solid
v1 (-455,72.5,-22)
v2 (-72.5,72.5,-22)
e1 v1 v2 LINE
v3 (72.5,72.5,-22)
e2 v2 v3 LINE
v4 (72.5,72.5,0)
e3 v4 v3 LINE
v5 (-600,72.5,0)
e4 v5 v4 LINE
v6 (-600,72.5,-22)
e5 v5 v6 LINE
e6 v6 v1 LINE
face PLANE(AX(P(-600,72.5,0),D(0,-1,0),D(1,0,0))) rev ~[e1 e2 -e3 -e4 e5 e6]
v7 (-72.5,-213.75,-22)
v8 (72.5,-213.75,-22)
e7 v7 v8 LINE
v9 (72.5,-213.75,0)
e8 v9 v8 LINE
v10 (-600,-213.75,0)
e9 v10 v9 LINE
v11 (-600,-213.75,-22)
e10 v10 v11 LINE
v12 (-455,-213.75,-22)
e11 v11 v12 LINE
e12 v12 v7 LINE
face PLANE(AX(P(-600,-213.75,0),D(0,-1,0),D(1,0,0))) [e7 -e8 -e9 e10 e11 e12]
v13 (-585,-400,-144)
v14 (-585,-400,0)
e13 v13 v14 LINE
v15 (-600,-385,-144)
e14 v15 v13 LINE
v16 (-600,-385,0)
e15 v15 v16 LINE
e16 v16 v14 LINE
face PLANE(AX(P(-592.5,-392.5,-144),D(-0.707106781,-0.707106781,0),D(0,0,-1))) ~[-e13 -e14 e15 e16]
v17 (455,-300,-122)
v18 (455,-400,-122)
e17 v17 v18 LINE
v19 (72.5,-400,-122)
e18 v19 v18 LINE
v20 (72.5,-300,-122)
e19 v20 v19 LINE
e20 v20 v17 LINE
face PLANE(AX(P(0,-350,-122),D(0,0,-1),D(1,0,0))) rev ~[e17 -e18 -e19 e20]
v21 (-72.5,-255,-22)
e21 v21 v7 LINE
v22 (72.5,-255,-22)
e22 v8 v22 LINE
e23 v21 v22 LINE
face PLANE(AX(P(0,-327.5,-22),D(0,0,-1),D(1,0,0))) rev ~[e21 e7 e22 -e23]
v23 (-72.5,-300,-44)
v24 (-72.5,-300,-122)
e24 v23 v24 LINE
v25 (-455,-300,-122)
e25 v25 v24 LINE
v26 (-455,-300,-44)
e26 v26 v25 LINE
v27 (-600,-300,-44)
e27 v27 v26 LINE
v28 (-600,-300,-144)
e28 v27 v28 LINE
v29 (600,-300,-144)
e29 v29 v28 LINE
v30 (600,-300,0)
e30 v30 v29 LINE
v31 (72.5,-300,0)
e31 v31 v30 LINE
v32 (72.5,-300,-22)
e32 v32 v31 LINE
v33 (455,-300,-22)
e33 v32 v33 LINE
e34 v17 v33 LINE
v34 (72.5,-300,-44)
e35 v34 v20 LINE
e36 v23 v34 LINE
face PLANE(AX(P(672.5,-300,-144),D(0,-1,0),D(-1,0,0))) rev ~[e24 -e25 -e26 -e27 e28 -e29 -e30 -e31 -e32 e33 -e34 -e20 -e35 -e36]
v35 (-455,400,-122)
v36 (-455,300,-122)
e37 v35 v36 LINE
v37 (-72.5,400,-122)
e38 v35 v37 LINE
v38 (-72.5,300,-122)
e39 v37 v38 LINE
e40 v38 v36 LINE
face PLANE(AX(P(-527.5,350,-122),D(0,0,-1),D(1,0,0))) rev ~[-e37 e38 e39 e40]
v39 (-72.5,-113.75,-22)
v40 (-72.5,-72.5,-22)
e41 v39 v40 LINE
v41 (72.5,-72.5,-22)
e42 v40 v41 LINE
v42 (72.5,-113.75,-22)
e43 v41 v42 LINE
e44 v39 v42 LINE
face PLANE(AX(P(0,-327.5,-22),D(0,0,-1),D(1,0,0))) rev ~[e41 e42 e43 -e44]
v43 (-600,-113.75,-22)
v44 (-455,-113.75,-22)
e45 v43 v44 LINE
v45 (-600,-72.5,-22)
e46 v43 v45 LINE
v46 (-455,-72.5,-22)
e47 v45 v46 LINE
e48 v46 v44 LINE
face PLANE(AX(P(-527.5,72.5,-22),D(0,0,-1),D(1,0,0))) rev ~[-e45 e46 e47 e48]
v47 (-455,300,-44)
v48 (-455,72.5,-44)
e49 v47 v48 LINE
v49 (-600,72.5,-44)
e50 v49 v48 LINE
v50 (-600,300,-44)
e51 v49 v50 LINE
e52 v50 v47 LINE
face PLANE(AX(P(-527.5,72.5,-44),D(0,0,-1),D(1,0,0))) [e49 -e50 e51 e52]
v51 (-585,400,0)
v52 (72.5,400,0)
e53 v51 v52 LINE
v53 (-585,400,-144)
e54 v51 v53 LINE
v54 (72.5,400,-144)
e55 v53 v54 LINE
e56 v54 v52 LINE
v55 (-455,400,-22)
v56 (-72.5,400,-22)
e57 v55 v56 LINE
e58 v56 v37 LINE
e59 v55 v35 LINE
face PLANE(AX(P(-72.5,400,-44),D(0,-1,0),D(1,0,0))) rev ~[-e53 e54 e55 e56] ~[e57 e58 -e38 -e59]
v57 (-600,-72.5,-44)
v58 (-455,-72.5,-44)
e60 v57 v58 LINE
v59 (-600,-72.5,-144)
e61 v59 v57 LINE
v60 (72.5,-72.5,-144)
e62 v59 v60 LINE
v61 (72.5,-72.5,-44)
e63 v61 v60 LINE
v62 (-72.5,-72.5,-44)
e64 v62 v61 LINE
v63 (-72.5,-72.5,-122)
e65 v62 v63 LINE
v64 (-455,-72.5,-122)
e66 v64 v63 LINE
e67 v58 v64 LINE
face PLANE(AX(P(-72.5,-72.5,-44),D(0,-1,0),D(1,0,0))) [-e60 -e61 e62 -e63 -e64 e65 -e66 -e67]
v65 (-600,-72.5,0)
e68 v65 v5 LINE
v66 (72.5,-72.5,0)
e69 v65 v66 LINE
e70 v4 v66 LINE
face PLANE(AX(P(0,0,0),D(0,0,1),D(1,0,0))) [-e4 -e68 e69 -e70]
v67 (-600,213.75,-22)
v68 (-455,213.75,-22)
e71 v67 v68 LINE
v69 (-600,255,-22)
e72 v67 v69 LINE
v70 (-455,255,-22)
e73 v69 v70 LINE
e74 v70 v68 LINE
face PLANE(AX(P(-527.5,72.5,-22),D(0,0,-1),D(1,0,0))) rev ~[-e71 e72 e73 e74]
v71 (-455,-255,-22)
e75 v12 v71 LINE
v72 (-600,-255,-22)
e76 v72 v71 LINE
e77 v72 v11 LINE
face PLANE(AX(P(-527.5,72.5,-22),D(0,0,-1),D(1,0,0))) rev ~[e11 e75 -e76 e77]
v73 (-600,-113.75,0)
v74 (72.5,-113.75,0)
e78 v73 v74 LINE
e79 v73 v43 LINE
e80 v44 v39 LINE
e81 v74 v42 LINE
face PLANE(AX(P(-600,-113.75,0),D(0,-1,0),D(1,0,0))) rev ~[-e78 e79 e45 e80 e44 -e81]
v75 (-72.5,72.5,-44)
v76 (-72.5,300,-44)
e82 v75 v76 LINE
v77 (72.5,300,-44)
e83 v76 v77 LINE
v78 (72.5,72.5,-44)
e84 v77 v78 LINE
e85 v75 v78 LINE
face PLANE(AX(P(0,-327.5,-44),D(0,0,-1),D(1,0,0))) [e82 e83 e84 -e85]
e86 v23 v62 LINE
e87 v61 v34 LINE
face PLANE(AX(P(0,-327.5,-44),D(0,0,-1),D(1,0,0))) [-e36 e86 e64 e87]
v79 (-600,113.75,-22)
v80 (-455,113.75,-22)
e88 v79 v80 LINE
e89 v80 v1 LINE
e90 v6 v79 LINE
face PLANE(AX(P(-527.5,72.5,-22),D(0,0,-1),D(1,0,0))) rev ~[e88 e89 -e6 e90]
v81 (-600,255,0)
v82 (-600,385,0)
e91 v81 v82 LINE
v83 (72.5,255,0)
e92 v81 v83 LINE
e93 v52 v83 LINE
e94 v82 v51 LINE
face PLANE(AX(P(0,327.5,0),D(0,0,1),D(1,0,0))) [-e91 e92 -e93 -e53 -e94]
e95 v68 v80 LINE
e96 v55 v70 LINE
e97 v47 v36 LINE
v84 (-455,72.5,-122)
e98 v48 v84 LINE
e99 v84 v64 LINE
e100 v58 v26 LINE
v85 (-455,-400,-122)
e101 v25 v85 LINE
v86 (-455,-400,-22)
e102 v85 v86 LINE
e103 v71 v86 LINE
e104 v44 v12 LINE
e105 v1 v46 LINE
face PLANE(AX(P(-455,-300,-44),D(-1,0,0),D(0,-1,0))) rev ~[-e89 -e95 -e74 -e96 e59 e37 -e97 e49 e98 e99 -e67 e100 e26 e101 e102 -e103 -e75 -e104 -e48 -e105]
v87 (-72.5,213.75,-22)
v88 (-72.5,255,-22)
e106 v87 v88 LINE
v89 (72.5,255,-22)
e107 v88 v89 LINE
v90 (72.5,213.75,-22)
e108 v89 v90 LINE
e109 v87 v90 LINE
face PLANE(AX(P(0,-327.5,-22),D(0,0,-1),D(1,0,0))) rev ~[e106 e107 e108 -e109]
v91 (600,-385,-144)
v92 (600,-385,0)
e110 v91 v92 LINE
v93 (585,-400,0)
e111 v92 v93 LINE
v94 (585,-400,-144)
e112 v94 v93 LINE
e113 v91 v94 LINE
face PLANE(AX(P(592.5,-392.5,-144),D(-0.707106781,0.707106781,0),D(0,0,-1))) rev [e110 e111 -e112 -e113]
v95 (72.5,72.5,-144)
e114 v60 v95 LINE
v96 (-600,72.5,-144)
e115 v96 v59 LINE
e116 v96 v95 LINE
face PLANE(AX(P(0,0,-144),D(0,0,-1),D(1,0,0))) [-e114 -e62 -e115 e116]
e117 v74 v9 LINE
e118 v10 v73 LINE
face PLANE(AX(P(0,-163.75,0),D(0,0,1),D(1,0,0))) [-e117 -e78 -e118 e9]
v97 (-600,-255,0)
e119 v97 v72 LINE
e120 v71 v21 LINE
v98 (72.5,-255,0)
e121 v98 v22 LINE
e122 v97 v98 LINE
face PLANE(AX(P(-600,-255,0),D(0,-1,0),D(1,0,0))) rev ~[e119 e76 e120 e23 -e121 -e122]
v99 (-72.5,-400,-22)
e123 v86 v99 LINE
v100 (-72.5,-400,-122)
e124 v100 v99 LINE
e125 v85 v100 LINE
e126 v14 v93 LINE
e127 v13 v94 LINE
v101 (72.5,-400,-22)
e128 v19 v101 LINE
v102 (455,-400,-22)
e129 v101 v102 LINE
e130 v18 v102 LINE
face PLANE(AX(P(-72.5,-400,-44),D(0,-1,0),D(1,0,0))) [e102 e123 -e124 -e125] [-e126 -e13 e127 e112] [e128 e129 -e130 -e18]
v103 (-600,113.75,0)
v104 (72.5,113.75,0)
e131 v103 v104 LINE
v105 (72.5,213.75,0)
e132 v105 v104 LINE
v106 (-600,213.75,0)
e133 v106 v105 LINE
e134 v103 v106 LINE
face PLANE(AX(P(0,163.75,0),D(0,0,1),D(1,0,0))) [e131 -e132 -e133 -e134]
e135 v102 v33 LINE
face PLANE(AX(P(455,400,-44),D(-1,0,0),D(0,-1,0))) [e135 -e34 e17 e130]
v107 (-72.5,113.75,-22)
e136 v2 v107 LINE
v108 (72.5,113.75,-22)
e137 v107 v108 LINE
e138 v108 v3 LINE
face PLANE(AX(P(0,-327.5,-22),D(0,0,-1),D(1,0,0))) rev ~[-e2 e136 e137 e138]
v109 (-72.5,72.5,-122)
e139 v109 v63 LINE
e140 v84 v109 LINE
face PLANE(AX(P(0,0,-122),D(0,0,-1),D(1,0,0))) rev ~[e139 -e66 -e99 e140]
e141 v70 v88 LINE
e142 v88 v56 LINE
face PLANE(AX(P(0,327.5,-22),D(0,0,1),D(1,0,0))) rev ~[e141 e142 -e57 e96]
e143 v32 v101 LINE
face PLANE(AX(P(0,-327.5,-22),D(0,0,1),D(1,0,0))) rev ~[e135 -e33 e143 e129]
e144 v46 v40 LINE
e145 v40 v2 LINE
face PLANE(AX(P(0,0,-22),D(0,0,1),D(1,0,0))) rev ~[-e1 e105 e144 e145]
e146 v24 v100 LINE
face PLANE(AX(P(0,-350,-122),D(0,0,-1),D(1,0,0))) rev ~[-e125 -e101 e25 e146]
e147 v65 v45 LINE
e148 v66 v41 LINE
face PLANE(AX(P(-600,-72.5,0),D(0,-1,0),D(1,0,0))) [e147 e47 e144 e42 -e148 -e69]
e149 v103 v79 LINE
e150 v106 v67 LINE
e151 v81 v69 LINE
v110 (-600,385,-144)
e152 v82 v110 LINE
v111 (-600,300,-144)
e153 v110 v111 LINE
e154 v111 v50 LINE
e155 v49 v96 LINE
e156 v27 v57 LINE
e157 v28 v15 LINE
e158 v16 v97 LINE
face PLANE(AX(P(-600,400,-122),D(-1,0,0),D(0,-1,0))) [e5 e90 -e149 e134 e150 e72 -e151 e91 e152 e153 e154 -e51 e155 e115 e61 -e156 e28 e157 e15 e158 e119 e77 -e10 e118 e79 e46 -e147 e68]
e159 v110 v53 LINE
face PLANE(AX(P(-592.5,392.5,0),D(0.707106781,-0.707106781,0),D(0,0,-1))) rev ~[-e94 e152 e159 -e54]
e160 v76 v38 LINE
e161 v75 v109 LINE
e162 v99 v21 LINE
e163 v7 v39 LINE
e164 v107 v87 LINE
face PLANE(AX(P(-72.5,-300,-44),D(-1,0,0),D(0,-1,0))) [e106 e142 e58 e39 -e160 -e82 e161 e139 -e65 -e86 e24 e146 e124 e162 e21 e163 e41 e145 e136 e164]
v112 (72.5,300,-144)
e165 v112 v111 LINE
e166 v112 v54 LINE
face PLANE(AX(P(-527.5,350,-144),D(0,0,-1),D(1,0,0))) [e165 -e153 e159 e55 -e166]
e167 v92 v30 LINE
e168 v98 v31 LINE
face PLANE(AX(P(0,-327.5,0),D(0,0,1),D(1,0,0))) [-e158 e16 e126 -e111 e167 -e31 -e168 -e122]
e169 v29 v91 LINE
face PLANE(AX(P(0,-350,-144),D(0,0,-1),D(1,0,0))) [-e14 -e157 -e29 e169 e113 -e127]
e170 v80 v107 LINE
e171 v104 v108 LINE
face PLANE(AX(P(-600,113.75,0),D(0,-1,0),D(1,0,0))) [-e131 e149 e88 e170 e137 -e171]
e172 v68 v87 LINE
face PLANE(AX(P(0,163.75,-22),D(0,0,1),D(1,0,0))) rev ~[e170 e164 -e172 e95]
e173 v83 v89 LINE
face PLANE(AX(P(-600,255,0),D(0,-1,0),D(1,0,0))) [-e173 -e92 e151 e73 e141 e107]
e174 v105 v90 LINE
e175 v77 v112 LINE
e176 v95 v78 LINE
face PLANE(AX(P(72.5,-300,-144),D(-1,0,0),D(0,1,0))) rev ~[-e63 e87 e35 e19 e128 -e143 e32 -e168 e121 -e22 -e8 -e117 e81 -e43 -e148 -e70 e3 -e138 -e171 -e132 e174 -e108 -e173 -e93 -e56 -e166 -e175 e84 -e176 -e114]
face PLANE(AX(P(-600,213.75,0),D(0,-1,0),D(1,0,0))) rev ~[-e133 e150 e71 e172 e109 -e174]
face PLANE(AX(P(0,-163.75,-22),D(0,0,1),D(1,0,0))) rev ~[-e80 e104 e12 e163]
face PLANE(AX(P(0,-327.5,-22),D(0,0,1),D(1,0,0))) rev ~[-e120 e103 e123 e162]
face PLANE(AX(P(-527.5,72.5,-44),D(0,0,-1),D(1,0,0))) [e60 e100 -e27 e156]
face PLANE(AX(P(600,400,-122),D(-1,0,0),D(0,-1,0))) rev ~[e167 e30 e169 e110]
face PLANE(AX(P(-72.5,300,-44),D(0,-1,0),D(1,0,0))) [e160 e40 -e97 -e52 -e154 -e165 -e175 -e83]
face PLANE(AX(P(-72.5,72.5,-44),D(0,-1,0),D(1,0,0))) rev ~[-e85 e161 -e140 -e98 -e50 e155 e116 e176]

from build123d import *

# Parameters (mm, degrees)
F0_W      = 1200
F0_H      = 145
F1_DEPTH  = 22
F0_H_2    = 100
F2_W      = 145
F2_H      = 655
F2_H_2    = 145
F3_DEPTH  = 22
F4_W      = 145
F4_H      = 100
F6_DEPTH  = 78
F4_H_2    = 145
F5_W      = 145
F5_H      = 145
F5_H_2    = 100
F7_W      = 145
F7_H      = 100
F7_W_2    = 1055
F8_DEPTH  = 22
F7_W_3    = 1200
F7_H_2    = 145
F10_SIZE  = 15
F11_W     = 527.5
F11_H     = 145
F12_DEPTH = 211


# Not quite as in the source:
# - a feature names something its author has since deleted; it is built from what else it names


with BuildPart() as f1:
    # F0 (on Top) → F1 (new body)
    with BuildSketch(Plane.XY):
        with Locations((0, 327.5)):
            Rectangle(F0_W, F0_H)
    extrude(amount=-F1_DEPTH)


with BuildPart() as f1b:
    # F0 (on Top) → F1, piece 2 (new body)
    with BuildSketch(Plane.XY):
        with Locations((0, 163.75)):
            Rectangle(F0_W, F0_H_2)
    extrude(amount=-F1_DEPTH)


with BuildPart() as f1c:
    # F0 (on Top) → F1, piece 3 (new body)
    with BuildSketch(Plane.XY):
        Rectangle(F0_W, F0_H)
    extrude(amount=-F1_DEPTH)


with BuildPart() as f1d:
    # F0 (on Top) → F1, piece 4 (new body)
    with BuildSketch(Plane.XY):
        with Locations((0, -163.75)):
            Rectangle(F0_W, F0_H_2)
    extrude(amount=-F1_DEPTH)


with BuildPart() as f1e:
    # F0 (on Top) → F1, piece 5 (new body)
    with BuildSketch(Plane.XY):
        with Locations((0, -327.5)):
            Rectangle(F0_W, F0_H)
    extrude(amount=-F1_DEPTH)


with BuildPart() as f3:
    # F2 (on face) → F3 (new body)
    with BuildSketch(Plane(origin=(0, 0, -22), x_dir=(1, 0, 0), z_dir=(0, 0, -1))):
        with Locations((-527.5, -72.5)):
            Rectangle(F2_W, F2_H)
        with Locations((-527.5, 327.5)):
            Rectangle(F2_W, F2_H_2)
    extrude(amount=F3_DEPTH)


with BuildPart() as f3b:
    # F2 (on face) → F3, piece 2 (new body)
    with BuildSketch(Plane(origin=(0, 0, -22), x_dir=(1, 0, 0), z_dir=(0, 0, -1))):
        with Locations((0, 327.5)):
            Rectangle(F2_W, F2_H_2)
        with Locations((0, -72.5)):
            Rectangle(F2_W, F2_H)
    extrude(amount=F3_DEPTH)


with BuildPart() as f3c:
    # F2 (on face) → F3, piece 3 (new body)
    with BuildSketch(Plane(origin=(0, 0, -22), x_dir=(1, 0, 0), z_dir=(0, 0, -1))):
        with Locations((527.5, 327.5)):
            Rectangle(F2_W, F2_H_2)
        with Locations((527.5, -72.5)):
            Rectangle(F2_W, F2_H)
    extrude(amount=F3_DEPTH)


with BuildPart() as f6:
    # F4 (on face) → F6 (new body)
    with BuildSketch(Plane(origin=(0, 0, -44), x_dir=(1, 0, 0), z_dir=(0, 0, -1))):
        with Locations((-527.5, -350)):
            Rectangle(F4_W, F4_H)
    extrude(amount=F6_DEPTH)


with BuildPart() as f6b:
    # F4 (on face) → F6, piece 2 (new body)
    with BuildSketch(Plane(origin=(0, 0, -44), x_dir=(1, 0, 0), z_dir=(0, 0, -1))):
        with Locations((-527.5, 350)):
            Rectangle(F4_W, F4_H)
    extrude(amount=F6_DEPTH)


with BuildPart() as f6c:
    # F4 (on face) → F6, piece 3 (new body)
    with BuildSketch(Plane(origin=(0, 0, -44), x_dir=(1, 0, 0), z_dir=(0, 0, -1))):
        with Locations((527.5, -350)):
            Rectangle(F4_W, F4_H)
    extrude(amount=F6_DEPTH)


with BuildPart() as f6d:
    # F4 (on face) → F6, piece 4 (new body)
    with BuildSketch(Plane(origin=(0, 0, -44), x_dir=(1, 0, 0), z_dir=(0, 0, -1))):
        with Locations((527.5, 0)):
            Rectangle(F4_W, F4_H_2)
    extrude(amount=F6_DEPTH)


with BuildPart() as f6e:
    # F4 (on face) → F6, piece 5 (new body)
    with BuildSketch(Plane(origin=(0, 0, -44), x_dir=(1, 0, 0), z_dir=(0, 0, -1))):
        with Locations((527.5, 350)):
            Rectangle(F4_W, F4_H)
    extrude(amount=F6_DEPTH)


with BuildPart() as f6f:
    # F4 (on face) → F6, piece 6 (new body)
    with BuildSketch(Plane(origin=(0, 0, -44), x_dir=(1, 0, 0), z_dir=(0, 0, -1))):
        with Locations((-527.5, 0)):
            Rectangle(F4_W, F4_H_2)
    extrude(amount=F6_DEPTH)


with BuildPart() as f6g:
    # F5 (on face) → F6, piece 7 (new body)
    with BuildSketch(Plane(origin=(0, 0, -44), x_dir=(1, 0, 0), z_dir=(0, 0, -1))):
        Rectangle(F5_W, F5_H)
    extrude(amount=F6_DEPTH)


with BuildPart() as f6h:
    # F5 (on face) → F6, piece 8 (new body)
    with BuildSketch(Plane(origin=(0, 0, -44), x_dir=(1, 0, 0), z_dir=(0, 0, -1))):
        with Locations((0, 350)):
            Rectangle(F5_W, F5_H_2)
    extrude(amount=F6_DEPTH)


with BuildPart() as f6i:
    # F5 (on face) → F6, piece 9 (new body)
    with BuildSketch(Plane(origin=(0, 0, -44), x_dir=(1, 0, 0), z_dir=(0, 0, -1))):
        with Locations((0, -350)):
            Rectangle(F5_W, F5_H_2)
    extrude(amount=F6_DEPTH)


with BuildPart() as f8:
    # F7 (on face) → F8 (new body)
    with BuildSketch(Plane(origin=(0, 0, -122), x_dir=(1, 0, 0), z_dir=(0, 0, -1))):
        with Locations((-527.5, -350)):
            Rectangle(F7_W, F7_H)
        with Locations((72.5, -350)):
            Rectangle(F7_W_2, F7_H)
    extrude(amount=F8_DEPTH)


with BuildPart() as f8b:
    # F7 (on face) → F8, piece 2 (new body)
    with BuildSketch(Plane(origin=(0, 0, -122), x_dir=(1, 0, 0), z_dir=(0, 0, -1))):
        Rectangle(F7_W_3, F7_H_2)
    extrude(amount=F8_DEPTH)


with BuildPart() as f8c:
    # F7 (on face) → F8, piece 3 (new body)
    with BuildSketch(Plane(origin=(0, 0, -122), x_dir=(1, 0, 0), z_dir=(0, 0, -1))):
        with Locations((0, 350)):
            Rectangle(F7_W_3, F7_H)
    extrude(amount=F8_DEPTH)


with BuildPart() as f3c_1:
    add(f3c.part)

    # F9: union F3b, F3, F1, F1b, F1e, F1d, F1c, F6, F6b, F6d, F6f, F8b, F8c, F6e, F6c, F8, F6i, F6g, F6h
    add(f3b.part)
    add(f3.part)
    add(f1.part)
    add(f1b.part)
    add(f1e.part)
    add(f1d.part)
    add(f1c.part)
    add(f6.part)
    add(f6b.part)
    add(f6d.part)
    add(f6f.part)
    add(f8b.part)
    add(f8c.part)
    add(f6e.part)
    add(f6c.part)
    add(f8.part)
    add(f6i.part)
    add(f6g.part)
    add(f6h.part)

    # F10
    f10_edges = [f3c_1.edges().sort_by_distance(p)[0] for p in [
        (-600, -400, -72),
        (600, -400, -72),
        (600, 400, -72),
        (-600, 400, -72),
    ]]
    chamfer(f10_edges, length=F10_SIZE)

    # F11 (on face) → F12 (cut)
    with BuildSketch(Plane(origin=(0, 0, -144), x_dir=(1, 0, 0), z_dir=(0, 0, -1))):
        with Locations((336.25, 0)):
            Rectangle(F11_W, F11_H)
        Polygon((672.5, -500), (672.5, 300), (72.5, 300), (72.5, 72.5), (600, 72.5), (600, -72.5), (72.5, -72.5), (72.5, -500), align=None)
    extrude(amount=-F12_DEPTH, mode=Mode.SUBTRACT)


solid = f3c_1.part
